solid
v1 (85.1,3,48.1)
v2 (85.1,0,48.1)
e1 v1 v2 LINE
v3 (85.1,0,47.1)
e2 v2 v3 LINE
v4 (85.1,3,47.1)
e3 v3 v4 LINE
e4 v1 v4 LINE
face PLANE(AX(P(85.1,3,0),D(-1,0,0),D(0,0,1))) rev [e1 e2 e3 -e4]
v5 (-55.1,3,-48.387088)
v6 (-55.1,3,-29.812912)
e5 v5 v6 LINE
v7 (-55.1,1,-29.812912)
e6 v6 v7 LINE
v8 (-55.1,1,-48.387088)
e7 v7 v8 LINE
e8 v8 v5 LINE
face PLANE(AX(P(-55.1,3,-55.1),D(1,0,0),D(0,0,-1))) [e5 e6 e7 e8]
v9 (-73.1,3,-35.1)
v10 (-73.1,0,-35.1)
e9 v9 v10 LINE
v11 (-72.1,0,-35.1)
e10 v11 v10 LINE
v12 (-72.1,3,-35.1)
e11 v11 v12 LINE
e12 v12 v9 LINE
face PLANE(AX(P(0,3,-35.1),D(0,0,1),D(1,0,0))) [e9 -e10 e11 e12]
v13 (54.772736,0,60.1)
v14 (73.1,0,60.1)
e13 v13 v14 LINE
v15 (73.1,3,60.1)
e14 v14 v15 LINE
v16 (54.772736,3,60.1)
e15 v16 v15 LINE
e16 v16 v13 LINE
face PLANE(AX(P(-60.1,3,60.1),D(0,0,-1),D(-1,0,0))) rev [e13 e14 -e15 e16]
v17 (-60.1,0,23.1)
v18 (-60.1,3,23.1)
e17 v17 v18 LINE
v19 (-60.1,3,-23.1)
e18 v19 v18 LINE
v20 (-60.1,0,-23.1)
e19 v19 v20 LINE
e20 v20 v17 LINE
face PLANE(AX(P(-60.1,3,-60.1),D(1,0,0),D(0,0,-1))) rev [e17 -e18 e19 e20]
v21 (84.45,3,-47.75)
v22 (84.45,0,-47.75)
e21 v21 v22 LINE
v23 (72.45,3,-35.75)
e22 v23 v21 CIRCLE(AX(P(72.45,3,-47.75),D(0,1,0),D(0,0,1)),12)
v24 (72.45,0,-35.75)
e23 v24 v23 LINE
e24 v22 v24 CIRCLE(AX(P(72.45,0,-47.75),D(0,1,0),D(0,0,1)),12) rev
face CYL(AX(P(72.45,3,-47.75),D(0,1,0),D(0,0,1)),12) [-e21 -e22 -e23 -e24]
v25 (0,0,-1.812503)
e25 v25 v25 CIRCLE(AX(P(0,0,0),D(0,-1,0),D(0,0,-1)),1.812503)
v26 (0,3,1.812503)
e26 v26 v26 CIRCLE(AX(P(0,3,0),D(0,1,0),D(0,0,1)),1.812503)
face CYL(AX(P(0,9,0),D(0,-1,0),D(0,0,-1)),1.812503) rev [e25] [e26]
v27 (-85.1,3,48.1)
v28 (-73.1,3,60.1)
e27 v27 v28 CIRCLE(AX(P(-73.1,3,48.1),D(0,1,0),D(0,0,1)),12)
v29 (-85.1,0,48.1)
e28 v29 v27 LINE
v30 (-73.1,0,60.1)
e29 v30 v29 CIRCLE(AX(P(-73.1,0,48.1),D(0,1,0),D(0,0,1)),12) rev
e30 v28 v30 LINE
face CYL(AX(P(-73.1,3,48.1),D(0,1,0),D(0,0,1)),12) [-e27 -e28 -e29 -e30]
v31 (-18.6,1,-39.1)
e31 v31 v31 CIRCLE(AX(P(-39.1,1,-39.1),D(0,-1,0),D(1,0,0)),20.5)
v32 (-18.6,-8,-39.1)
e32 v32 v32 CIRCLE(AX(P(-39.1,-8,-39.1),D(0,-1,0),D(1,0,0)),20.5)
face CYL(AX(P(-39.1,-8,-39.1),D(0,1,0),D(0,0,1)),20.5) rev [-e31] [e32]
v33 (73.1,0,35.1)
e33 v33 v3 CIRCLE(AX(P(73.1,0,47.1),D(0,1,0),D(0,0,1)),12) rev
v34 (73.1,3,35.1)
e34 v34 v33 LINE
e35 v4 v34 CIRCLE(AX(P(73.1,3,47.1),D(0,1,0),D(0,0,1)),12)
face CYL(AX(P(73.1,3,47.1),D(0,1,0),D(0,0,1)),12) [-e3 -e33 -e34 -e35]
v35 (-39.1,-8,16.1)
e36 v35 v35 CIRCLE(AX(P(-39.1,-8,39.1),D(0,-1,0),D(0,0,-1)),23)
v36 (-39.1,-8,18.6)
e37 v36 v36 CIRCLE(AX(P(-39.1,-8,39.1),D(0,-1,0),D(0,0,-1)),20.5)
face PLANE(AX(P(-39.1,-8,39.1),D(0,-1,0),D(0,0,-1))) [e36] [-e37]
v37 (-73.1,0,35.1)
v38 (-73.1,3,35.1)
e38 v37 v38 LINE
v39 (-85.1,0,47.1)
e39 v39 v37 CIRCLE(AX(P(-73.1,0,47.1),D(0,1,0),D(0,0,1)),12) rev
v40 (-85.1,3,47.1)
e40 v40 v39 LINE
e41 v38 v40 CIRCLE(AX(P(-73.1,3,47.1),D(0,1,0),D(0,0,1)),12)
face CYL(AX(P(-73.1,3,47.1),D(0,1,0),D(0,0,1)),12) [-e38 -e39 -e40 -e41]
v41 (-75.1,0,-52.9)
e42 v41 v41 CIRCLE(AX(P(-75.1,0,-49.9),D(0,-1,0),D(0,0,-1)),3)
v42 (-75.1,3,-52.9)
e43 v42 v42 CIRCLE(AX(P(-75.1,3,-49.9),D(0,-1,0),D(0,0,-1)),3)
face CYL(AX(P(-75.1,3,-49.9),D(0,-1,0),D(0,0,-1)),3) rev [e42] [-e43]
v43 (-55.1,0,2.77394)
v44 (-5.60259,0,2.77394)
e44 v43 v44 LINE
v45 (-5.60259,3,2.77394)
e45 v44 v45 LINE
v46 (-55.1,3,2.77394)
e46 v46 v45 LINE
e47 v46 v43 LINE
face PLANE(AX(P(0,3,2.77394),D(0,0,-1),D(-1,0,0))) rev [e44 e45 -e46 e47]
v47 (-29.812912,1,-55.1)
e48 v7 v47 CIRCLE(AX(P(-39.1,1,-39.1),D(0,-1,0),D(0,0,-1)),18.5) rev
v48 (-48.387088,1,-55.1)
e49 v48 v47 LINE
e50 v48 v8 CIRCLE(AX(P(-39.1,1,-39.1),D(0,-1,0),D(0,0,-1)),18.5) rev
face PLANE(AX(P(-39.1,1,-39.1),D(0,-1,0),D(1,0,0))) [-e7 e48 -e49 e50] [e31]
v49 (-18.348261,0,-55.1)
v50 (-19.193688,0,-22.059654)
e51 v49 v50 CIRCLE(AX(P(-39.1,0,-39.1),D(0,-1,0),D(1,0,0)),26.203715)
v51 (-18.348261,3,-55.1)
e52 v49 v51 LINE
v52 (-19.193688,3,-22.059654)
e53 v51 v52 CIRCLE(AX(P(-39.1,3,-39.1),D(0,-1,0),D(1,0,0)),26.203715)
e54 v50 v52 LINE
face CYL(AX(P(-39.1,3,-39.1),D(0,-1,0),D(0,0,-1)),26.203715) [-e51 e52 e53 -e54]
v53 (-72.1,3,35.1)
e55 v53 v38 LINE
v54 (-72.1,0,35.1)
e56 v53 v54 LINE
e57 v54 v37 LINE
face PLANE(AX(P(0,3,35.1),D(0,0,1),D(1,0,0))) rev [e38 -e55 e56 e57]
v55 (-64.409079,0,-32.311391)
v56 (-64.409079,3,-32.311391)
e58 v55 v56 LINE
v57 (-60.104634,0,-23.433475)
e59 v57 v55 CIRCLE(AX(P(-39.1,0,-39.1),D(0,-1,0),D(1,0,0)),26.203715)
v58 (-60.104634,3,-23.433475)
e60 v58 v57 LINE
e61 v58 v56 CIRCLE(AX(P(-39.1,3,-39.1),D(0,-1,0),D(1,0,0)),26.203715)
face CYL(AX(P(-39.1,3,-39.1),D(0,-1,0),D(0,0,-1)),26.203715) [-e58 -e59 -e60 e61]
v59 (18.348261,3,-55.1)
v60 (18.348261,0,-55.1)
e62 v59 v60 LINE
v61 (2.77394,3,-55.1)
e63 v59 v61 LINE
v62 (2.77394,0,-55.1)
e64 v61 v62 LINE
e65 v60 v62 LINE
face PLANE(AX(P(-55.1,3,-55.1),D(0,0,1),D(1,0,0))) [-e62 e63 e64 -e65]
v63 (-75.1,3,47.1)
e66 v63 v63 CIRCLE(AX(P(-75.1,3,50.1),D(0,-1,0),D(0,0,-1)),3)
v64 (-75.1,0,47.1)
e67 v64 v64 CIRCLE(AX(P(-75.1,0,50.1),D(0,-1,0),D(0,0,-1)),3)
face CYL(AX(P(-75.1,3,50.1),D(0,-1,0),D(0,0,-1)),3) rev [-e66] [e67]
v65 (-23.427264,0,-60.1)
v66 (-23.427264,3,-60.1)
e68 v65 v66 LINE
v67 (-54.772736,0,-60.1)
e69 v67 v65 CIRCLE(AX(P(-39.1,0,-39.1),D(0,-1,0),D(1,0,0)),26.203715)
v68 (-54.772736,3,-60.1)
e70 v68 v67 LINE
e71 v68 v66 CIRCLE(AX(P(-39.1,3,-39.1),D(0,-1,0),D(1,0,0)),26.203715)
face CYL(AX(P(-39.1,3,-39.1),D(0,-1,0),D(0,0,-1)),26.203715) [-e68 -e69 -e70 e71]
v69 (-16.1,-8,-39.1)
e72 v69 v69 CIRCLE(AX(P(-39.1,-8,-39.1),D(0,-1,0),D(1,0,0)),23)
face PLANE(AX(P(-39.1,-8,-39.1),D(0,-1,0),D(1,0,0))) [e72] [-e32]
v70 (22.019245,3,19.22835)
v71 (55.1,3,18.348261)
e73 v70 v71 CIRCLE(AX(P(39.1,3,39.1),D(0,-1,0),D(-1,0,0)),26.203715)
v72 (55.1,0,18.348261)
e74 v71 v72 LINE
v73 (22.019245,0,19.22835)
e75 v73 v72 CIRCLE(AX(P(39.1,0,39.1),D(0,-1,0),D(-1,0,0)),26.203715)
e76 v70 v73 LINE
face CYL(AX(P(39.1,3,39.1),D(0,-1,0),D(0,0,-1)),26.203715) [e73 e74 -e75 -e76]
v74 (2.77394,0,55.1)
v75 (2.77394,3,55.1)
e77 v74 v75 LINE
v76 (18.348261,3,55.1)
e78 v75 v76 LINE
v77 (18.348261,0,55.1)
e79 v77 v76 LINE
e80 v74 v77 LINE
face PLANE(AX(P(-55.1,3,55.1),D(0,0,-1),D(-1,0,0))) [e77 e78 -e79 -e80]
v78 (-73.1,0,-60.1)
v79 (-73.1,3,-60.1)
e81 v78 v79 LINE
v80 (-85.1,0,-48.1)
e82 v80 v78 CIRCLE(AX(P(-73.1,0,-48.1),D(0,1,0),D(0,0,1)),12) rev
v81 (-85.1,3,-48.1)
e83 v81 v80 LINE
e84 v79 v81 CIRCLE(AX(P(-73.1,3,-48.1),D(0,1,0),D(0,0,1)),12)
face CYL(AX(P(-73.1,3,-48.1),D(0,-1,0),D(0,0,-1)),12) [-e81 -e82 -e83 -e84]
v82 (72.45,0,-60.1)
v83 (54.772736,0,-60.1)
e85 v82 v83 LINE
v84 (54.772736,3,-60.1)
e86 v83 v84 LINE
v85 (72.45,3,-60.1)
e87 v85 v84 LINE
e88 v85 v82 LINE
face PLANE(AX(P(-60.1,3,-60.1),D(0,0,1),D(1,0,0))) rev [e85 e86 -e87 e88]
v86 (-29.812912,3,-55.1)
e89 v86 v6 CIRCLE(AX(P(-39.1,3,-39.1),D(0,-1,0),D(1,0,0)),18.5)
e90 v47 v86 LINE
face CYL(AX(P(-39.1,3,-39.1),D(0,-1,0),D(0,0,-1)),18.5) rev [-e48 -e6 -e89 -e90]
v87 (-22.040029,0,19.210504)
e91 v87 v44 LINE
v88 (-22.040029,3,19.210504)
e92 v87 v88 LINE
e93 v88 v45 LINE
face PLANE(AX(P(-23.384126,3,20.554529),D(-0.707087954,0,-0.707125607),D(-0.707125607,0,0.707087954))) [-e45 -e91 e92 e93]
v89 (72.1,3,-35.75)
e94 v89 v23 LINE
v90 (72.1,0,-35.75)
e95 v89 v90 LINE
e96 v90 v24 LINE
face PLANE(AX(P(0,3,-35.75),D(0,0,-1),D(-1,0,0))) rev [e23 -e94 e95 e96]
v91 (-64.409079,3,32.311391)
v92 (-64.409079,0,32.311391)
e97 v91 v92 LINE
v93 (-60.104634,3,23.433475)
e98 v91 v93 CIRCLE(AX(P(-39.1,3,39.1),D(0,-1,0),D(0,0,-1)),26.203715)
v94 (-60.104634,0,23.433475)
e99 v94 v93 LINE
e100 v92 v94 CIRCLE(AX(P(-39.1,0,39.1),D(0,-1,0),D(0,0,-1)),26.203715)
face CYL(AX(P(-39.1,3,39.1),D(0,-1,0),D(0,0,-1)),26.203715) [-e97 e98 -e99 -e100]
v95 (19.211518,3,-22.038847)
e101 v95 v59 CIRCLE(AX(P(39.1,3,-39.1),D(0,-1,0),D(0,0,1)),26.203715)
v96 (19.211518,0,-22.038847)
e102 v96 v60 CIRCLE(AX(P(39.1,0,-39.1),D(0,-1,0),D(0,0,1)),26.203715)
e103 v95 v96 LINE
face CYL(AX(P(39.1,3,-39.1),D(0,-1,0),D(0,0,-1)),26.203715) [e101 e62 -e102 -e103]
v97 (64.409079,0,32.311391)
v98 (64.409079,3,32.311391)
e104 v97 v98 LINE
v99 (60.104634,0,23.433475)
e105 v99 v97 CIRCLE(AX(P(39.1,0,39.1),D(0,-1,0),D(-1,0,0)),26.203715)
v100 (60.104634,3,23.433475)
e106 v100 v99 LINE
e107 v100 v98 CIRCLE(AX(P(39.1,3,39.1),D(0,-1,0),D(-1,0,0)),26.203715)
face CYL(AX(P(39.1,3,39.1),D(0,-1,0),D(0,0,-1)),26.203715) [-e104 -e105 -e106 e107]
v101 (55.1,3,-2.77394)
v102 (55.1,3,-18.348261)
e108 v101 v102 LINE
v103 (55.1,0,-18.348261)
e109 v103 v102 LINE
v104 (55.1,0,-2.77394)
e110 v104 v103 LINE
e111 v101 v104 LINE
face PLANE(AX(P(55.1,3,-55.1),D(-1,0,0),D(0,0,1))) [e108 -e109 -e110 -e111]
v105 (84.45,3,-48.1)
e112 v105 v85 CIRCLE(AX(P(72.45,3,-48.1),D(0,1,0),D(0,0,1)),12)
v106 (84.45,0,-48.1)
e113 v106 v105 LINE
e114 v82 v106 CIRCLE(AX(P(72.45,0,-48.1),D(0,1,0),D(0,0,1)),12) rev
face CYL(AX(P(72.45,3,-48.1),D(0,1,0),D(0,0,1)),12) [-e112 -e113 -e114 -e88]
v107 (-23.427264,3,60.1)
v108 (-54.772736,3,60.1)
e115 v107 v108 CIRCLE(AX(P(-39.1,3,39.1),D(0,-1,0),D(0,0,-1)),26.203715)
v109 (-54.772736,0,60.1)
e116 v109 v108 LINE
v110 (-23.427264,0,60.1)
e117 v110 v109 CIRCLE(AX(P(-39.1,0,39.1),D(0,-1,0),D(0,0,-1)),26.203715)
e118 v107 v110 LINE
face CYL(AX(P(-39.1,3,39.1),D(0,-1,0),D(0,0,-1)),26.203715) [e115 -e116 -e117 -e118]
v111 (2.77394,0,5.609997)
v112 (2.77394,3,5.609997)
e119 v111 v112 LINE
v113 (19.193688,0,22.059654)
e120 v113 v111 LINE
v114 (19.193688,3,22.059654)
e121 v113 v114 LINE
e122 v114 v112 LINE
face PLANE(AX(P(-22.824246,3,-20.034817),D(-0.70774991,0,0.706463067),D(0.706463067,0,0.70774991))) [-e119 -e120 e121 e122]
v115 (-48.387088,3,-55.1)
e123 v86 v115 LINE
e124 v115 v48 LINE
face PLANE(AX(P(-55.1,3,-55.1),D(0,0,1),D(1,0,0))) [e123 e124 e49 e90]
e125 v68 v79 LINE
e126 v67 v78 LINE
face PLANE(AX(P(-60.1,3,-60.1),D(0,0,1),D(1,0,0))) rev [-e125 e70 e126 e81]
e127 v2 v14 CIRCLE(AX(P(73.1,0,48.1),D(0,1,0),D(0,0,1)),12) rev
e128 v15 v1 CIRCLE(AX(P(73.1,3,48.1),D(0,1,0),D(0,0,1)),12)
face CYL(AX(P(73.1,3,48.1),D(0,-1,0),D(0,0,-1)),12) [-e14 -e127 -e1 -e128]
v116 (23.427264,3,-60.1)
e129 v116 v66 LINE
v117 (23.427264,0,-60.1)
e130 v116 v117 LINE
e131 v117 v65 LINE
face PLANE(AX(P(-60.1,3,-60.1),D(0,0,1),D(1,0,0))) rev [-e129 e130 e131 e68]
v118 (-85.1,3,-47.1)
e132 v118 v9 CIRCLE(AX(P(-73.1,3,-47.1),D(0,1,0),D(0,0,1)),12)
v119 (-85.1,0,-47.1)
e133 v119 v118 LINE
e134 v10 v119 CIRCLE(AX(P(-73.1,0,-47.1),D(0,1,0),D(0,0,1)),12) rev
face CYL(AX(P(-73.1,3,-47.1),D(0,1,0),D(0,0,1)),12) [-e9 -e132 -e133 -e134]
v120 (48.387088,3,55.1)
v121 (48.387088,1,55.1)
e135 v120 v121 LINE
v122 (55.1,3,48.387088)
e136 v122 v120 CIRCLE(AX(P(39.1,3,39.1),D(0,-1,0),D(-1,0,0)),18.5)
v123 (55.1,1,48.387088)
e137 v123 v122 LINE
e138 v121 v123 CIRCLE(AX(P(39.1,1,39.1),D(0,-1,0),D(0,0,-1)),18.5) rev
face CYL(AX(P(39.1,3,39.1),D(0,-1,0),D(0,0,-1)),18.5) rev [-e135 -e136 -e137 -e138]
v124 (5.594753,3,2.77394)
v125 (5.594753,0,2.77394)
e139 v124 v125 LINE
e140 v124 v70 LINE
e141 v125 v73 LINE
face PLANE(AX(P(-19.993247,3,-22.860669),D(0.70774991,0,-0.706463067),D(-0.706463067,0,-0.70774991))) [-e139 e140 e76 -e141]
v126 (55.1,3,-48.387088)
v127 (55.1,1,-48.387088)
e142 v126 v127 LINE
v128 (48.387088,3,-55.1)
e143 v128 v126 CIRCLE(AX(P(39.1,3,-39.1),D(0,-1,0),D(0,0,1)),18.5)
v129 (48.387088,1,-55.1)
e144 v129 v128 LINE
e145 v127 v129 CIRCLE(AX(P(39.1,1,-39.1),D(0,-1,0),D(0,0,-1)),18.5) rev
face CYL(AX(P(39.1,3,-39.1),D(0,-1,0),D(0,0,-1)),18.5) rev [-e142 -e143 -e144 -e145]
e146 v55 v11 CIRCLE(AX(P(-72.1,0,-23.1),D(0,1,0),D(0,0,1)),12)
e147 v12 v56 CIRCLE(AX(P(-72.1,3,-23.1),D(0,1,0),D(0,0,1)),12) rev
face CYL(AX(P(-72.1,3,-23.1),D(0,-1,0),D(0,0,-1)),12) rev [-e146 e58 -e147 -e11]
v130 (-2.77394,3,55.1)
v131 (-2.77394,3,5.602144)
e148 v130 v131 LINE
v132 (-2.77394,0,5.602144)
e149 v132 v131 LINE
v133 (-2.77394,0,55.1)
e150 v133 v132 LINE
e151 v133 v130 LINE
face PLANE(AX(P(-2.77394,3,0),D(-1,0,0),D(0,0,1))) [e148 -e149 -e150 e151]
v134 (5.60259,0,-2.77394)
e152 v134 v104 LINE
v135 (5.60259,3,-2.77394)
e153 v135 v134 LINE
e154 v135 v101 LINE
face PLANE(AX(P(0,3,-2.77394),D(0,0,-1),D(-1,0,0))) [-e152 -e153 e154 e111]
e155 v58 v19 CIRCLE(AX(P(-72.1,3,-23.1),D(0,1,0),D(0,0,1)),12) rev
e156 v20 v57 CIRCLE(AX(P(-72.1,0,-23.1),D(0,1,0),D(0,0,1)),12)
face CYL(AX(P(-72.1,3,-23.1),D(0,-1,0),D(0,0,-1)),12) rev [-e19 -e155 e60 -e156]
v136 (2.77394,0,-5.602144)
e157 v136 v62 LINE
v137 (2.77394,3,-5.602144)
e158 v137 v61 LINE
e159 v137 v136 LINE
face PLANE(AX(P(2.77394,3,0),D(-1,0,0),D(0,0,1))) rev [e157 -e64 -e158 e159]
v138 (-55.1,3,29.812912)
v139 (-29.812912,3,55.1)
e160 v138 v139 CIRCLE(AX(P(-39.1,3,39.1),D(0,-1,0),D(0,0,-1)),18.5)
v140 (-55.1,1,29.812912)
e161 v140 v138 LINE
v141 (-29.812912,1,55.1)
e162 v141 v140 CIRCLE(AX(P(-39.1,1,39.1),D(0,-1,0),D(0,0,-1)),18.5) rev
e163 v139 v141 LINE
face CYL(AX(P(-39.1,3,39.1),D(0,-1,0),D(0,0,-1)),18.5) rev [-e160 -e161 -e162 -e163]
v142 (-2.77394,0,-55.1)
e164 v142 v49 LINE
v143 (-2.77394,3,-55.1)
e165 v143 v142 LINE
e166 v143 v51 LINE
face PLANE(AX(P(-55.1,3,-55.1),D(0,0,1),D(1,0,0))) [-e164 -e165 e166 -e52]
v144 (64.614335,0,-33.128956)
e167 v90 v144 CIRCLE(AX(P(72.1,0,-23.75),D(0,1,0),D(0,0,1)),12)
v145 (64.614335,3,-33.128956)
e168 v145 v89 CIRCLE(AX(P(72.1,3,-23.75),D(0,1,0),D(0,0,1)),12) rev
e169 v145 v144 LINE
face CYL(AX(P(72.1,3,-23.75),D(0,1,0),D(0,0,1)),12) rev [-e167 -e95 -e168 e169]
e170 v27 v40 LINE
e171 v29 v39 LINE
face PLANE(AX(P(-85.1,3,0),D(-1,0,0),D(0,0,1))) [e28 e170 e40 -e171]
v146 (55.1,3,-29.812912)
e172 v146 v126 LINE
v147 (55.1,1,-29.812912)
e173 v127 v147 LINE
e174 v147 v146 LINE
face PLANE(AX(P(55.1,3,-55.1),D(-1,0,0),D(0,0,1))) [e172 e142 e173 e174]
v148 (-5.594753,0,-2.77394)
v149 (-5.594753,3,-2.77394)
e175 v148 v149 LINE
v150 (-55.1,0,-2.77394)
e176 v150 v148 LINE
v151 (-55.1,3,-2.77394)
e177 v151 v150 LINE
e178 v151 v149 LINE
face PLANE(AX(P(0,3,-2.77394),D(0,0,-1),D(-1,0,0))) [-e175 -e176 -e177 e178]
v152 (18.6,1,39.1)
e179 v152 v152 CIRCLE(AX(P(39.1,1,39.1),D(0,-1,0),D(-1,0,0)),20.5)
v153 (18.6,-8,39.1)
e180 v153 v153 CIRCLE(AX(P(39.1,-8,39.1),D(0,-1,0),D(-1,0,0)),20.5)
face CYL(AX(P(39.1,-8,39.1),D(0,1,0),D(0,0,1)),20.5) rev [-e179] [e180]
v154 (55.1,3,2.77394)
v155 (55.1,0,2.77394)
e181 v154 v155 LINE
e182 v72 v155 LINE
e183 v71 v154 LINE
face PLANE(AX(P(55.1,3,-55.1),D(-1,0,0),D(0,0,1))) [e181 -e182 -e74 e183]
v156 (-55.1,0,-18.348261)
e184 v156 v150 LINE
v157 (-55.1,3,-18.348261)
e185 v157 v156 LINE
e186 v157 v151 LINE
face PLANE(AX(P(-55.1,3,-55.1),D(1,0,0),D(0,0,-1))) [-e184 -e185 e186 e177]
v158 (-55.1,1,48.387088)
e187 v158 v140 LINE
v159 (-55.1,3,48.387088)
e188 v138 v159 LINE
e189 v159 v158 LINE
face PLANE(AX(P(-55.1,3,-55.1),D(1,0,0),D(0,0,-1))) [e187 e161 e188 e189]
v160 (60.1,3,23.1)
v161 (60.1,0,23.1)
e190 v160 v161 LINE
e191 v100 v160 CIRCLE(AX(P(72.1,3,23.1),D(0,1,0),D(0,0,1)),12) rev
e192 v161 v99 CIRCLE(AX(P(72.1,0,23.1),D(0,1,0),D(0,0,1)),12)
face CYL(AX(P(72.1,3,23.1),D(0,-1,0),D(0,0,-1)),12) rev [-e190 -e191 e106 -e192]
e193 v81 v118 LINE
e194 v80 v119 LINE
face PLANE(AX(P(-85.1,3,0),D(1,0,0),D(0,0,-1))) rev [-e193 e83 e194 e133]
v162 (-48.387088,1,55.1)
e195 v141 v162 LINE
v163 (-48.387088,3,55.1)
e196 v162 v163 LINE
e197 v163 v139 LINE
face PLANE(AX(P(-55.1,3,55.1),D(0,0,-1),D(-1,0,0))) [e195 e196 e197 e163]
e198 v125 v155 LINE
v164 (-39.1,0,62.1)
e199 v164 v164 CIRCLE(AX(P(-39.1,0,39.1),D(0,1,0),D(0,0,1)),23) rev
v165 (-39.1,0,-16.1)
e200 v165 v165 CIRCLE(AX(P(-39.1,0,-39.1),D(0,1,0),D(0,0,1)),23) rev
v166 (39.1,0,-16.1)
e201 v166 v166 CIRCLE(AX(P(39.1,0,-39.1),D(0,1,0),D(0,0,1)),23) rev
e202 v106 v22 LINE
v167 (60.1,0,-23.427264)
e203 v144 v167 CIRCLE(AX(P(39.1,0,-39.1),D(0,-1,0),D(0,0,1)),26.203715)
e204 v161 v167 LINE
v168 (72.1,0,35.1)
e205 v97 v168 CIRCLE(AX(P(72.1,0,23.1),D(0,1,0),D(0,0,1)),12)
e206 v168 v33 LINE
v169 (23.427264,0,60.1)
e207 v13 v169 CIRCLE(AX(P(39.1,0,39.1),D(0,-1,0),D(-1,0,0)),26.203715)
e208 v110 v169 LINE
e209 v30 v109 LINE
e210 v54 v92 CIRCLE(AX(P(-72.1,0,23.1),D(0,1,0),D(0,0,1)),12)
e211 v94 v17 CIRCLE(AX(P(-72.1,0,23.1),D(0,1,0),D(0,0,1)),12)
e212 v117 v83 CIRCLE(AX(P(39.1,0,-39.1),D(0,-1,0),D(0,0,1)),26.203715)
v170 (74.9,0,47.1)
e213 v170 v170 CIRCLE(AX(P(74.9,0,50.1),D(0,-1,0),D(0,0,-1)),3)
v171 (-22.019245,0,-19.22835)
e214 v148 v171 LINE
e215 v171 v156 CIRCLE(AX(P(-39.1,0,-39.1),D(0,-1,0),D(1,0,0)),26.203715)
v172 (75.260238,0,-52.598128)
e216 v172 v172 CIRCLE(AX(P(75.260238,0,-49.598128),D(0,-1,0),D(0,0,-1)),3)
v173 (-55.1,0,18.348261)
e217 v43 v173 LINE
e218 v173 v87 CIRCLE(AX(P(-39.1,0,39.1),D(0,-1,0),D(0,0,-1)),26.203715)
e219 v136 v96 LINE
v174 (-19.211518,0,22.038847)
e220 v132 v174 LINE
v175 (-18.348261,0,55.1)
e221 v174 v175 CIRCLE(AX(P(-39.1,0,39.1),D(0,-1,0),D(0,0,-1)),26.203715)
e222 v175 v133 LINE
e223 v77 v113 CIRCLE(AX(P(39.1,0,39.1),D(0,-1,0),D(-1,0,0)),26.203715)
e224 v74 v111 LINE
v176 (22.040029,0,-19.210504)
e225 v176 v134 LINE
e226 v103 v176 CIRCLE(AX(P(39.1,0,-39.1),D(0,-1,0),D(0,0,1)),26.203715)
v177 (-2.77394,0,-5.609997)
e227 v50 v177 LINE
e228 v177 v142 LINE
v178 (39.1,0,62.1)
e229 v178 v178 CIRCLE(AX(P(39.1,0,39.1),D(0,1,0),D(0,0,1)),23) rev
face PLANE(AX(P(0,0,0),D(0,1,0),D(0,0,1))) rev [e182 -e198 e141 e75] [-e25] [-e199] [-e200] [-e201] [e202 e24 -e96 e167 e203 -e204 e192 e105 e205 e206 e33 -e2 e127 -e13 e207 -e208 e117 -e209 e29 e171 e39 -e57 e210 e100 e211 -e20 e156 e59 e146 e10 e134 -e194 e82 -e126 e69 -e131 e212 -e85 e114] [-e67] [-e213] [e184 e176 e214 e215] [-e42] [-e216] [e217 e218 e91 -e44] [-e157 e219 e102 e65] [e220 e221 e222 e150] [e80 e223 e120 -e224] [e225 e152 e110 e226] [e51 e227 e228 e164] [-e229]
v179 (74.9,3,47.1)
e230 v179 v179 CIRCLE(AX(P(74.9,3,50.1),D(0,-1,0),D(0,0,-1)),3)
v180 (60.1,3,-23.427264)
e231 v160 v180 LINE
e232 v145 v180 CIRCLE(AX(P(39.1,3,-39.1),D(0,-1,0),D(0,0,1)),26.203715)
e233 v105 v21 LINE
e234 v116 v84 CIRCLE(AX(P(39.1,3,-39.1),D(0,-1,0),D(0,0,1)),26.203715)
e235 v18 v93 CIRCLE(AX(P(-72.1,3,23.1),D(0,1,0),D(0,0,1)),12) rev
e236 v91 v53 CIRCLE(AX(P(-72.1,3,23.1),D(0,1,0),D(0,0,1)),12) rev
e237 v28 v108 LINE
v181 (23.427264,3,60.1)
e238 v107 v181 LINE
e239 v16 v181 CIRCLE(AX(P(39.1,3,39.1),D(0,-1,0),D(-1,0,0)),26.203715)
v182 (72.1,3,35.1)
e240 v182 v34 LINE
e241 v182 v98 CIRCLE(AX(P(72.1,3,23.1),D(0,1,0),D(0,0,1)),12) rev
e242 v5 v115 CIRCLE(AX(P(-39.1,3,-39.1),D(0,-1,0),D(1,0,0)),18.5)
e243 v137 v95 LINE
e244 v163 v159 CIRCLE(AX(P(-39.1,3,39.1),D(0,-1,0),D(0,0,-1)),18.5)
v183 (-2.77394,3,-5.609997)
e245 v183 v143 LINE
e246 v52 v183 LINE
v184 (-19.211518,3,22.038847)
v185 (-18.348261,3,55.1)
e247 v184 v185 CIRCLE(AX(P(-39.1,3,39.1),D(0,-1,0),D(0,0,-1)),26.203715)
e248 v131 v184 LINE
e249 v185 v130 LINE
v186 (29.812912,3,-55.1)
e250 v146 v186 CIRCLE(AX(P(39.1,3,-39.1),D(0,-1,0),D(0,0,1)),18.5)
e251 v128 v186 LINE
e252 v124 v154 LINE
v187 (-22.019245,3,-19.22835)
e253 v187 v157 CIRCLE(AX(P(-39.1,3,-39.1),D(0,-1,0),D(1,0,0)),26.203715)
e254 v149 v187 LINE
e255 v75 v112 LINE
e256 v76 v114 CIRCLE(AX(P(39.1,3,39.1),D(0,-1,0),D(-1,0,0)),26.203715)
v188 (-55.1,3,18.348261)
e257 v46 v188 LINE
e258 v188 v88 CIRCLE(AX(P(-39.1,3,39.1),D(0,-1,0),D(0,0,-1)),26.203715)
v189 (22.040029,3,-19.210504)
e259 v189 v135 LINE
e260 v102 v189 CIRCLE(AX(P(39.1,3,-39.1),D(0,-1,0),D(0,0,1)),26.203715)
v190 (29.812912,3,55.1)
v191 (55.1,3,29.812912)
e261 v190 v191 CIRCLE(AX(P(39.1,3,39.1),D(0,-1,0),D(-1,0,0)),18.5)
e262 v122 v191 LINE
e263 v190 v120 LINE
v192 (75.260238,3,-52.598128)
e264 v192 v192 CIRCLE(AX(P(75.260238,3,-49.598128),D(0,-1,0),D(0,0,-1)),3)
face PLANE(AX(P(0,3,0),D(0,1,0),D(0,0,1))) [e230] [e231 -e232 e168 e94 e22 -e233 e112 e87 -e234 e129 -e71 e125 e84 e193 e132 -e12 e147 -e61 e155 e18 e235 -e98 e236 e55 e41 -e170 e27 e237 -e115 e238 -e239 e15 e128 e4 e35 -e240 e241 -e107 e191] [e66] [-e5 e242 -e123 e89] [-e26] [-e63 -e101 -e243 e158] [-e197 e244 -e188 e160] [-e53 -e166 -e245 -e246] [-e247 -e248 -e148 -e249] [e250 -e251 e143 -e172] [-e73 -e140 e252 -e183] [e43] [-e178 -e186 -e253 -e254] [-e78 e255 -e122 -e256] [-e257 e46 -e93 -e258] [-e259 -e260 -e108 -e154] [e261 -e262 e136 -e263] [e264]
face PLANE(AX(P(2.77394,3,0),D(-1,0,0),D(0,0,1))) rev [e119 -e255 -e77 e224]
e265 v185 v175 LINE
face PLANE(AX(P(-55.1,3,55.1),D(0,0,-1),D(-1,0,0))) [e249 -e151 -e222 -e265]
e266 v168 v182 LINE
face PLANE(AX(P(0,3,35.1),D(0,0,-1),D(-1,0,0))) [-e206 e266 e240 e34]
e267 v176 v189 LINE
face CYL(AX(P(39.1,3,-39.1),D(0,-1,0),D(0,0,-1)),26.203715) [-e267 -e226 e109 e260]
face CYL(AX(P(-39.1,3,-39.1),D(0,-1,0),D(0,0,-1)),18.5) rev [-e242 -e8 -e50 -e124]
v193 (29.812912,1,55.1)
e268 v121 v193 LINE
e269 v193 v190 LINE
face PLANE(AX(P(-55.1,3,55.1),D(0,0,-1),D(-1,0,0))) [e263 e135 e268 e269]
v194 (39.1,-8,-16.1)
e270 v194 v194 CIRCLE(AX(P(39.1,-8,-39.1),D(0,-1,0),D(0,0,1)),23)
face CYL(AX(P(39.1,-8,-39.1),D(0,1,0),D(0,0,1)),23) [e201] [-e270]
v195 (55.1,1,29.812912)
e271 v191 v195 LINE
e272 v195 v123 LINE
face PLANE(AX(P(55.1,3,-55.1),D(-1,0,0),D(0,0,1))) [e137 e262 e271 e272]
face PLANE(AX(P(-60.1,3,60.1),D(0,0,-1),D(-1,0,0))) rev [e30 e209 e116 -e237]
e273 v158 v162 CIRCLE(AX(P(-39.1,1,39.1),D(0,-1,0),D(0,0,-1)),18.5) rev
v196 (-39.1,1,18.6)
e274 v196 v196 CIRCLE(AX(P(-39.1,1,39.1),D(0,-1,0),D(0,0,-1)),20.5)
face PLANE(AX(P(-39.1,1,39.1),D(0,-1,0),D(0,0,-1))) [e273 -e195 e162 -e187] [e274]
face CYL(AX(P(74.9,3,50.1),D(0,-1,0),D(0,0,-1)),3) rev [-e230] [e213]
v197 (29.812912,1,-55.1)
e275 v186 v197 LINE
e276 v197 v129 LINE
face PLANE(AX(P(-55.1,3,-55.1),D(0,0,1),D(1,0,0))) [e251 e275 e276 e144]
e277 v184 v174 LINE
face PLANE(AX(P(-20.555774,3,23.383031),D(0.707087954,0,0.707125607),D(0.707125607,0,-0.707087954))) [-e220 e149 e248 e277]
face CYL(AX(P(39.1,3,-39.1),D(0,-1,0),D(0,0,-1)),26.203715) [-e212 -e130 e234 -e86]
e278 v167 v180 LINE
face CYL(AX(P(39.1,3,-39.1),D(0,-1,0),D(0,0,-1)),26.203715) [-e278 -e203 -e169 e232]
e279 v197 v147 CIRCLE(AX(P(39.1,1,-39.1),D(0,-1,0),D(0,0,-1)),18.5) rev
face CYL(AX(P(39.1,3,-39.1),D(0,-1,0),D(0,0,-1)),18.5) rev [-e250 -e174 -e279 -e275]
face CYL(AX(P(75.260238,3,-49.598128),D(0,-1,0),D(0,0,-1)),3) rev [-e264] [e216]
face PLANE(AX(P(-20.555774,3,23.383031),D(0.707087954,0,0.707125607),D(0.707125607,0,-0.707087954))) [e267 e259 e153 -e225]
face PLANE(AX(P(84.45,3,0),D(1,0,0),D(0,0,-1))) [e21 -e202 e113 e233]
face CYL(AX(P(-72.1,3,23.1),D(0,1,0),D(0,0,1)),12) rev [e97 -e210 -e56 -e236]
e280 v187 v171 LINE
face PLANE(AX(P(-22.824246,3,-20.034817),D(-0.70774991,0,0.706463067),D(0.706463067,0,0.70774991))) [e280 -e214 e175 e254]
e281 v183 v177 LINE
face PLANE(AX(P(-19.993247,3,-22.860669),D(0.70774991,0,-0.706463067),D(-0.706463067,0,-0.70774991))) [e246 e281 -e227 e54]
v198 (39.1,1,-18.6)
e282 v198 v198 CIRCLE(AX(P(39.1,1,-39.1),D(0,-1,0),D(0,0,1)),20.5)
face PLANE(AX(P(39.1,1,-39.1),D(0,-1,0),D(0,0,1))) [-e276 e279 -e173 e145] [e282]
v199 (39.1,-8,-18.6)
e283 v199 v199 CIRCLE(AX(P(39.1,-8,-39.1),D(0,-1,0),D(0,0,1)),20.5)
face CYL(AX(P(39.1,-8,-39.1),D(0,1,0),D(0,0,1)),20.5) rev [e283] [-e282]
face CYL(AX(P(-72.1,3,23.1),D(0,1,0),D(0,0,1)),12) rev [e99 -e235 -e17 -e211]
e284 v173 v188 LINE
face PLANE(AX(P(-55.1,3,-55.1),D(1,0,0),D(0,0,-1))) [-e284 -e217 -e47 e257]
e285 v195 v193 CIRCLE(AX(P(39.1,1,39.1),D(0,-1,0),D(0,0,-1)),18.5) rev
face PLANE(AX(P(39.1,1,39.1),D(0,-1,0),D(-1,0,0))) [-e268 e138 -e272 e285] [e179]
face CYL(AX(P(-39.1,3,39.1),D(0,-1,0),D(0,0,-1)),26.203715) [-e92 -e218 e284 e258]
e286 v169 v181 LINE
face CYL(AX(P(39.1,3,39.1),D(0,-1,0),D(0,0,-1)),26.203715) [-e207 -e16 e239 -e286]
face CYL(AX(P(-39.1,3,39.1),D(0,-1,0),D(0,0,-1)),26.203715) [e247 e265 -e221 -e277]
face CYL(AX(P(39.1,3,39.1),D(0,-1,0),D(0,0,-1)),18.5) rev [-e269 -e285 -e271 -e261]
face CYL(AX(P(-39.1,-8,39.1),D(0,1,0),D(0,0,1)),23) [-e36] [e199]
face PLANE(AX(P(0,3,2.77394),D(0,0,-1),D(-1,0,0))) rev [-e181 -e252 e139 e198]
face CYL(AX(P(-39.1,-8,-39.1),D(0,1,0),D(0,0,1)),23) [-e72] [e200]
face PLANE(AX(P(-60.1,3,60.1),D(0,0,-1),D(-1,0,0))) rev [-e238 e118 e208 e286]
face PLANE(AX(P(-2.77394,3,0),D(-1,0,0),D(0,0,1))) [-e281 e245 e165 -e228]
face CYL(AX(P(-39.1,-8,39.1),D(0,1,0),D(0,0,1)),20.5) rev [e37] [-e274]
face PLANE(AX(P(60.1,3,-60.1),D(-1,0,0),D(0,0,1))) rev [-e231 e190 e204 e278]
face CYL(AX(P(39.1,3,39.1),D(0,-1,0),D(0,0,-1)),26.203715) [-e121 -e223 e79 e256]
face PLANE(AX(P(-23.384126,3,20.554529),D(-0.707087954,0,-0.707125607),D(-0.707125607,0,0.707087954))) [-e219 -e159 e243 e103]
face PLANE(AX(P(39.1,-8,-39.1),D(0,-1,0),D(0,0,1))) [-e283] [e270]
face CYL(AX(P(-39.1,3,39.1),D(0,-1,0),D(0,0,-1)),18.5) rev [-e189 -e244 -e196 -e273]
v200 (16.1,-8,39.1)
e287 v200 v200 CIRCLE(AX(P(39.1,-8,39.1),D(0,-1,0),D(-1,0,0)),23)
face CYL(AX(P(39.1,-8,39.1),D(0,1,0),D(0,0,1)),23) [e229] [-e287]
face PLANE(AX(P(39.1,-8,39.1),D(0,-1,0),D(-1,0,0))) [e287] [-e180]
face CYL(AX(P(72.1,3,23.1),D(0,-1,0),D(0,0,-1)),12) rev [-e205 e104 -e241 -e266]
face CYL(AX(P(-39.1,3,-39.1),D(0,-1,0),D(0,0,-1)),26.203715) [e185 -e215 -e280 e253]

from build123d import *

# Parameters (mm, degrees)
SKETCH1_W           = 120.2
SKETCH1_H           = 120.2
SKETCH1_W_2         = 110.2
SKETCH1_H_2         = 110.2
BOSS_EXTRUDE1_DEPTH = 3
SKETCH3_W           = 25
SKETCH3_H           = 25
SKETCH3_R           = 3
SKETCH3_W_2         = 24.35
SKETCH3_H_2         = 24.35
BOSS_EXTRUDE3_DEPTH = 3
FILLET1_R           = 12
SKETCH4_R           = 26.20371479
SKETCH4_R_2         = 18.5
BOSS_EXTRUDE4_DEPTH = 3
SKETCH5_R           = 23
SKETCH5_R_2         = 20.5
BOSS_EXTRUDE5_DEPTH = 8
SKETCH6_R           = 14.298791064
BOSS_EXTRUDE6_DEPTH = 5.7
CIRPATTERN1_COUNT   = 4
SKETCH7_R           = 21.686675293
CUT_EXTRUDE1_DEPTH  = 5.7
BOSS_EXTRUDE7_DEPTH = 3
BOSS_EXTRUDE8_DEPTH = 3
BOSS_EXTRUDE9_DEPTH = 3
CUT_EXTRUDE2_START  = -9
SKETCH12_R          = 20.5
CUT_EXTRUDE2_DEPTH  = 9
SKETCH14_R          = 1.812502671
CUT_EXTRUDE3_DEPTH  = 9
CIRPATTERN2_COUNT   = 4


with BuildPart() as part:
    # Sketch1 → Boss-Extrude1 (new body)
    with BuildSketch(Plane(origin=(0, 0, 0), x_dir=(1, 0, 0), z_dir=(0, 1, 0))):
        Rectangle(SKETCH1_W, SKETCH1_H)
        Rectangle(SKETCH1_W_2, SKETCH1_H_2, mode=Mode.SUBTRACT)
    extrude(amount=BOSS_EXTRUDE1_DEPTH)

    # Sketch3 → Boss-Extrude3 (add)
    # profile 1 of 4: a face of its own
    with BuildSketch(Plane(origin=(0, 0, 0), x_dir=(-1, 0, 0), z_dir=(0, -1, 0))):
        with Locations((72.6, -47.6)):
            Rectangle(SKETCH3_W, SKETCH3_H)
        with Locations((75.1, -50.1)):
            Circle(SKETCH3_R, mode=Mode.SUBTRACT)
    # profile 2 of 4: a face of its own
    with BuildSketch(Plane(origin=(0, 0, 0), x_dir=(-1, 0, 0), z_dir=(0, -1, 0))):
        with Locations((-72.275, 47.925)):
            Rectangle(SKETCH3_W_2, SKETCH3_H_2)
        with Locations((-75.260238187, 49.598128293)):
            Circle(SKETCH3_R, mode=Mode.SUBTRACT)
    # profile 3 of 4: a face of its own
    with BuildSketch(Plane(origin=(0, 0, 0), x_dir=(-1, 0, 0), z_dir=(0, -1, 0))):
        Polygon((-60.1, -60.1), (-60.1, -50.1), (-60.1, -35.1), (-85.1, -35.1), (-85.1, -60.1), align=None)
        with Locations((-74.9, -50.1)):
            Circle(SKETCH3_R, mode=Mode.SUBTRACT)
    # profile 4 of 4: a face of its own
    with BuildSketch(Plane(origin=(0, 0, 0), x_dir=(-1, 0, 0), z_dir=(0, -1, 0))):
        Polygon((60.1, 35.1), (75.1, 35.1), (85.1, 35.1), (85.1, 60.1), (60.1, 60.1), align=None)
        with Locations((75.1, 49.9)):
            Circle(SKETCH3_R, mode=Mode.SUBTRACT)
    extrude(amount=-BOSS_EXTRUDE3_DEPTH)

    # Fillet1
    fillet1_edges = [part.edges().sort_by_distance(p)[0] for p in [
        (85.1, 1.5, 60.1),
        (85.1, 1.5, 35.1),
        (60.1, 1.5, 35.1),
        (-85.1, 1.5, -60.1),
        (-85.1, 1.5, -35.1),
        (-60.1, 1.5, -35.1),
        (-60.1, 1.5, 35.1),
        (-85.1, 1.5, 60.1),
        (-85.1, 1.5, 35.1),
        (84.45, 1.5, -60.1),
        (84.45, 1.5, -35.75),
        (60.1, 1.5, -35.75),
    ]]
    fillet(fillet1_edges, radius=FILLET1_R)

    # Sketch4 → Boss-Extrude4 (add)
    with BuildSketch(Plane(origin=(0, 0, 0), x_dir=(-1, 0, 0), z_dir=(0, -1, 0))):
        with Locations((39.1, -39.1)):
            Circle(SKETCH4_R)
        with Locations((39.1, -39.1)):
            Circle(SKETCH4_R_2, mode=Mode.SUBTRACT)
    boss_extrude4 = extrude(amount=-BOSS_EXTRUDE4_DEPTH)

    # Sketch5 → Boss-Extrude5 (add)
    with BuildSketch(Plane(origin=(0, 0, 0), x_dir=(-1, 0, 0), z_dir=(0, -1, 0))):
        with Locations((39.1, -39.1)):
            Circle(SKETCH5_R)
        with Locations((39.1, -39.1)):
            Circle(SKETCH5_R_2, mode=Mode.SUBTRACT)
    boss_extrude5 = extrude(amount=BOSS_EXTRUDE5_DEPTH)

    # CirPattern1: Boss-Extrude4, Boss-Extrude5 ×4 about axis
    cirpattern1_axis = Axis((0, 0, 0), (0, 1, 0))
    add([boss_extrude4.rotate(cirpattern1_axis, i * 360 / CIRPATTERN1_COUNT) for i in range(1, CIRPATTERN1_COUNT)])
    add([boss_extrude5.rotate(cirpattern1_axis, i * 360 / CIRPATTERN1_COUNT) for i in range(1, CIRPATTERN1_COUNT)])

    # Sketch8 → Boss-Extrude7 (add)
    with BuildSketch(Plane(origin=(0, 0, 0), x_dir=(-1, 0, 0), z_dir=(0, -1, 0))):
        Polygon((2.773939536, -2.773939536), (55.1, -2.773939536), (55.1, 2.773939536), (2.773939536, 2.773939536), (2.773939536, 58.599472693), (-2.773939536, 58.599472693), (-2.773939536, 2.773939536), (-55.1, 2.773939536), (-55.1, -2.773939536), (-2.773939536, -2.773939536), (-2.773939536, -58.599472693), (2.773939536, -58.599472693), align=None)
    extrude(amount=-BOSS_EXTRUDE7_DEPTH)

    # Sketch9 → Boss-Extrude8 (add)
    with BuildSketch(Plane(origin=(0, 0, 0), x_dir=(-1, 0, 0), z_dir=(0, -1, 0))):
        Polygon((22.82424649, 20.034817185), (-19.99324685, -22.860669453), (-22.82424649, -20.034817185), (19.99324685, 22.860669453), align=None)
    extrude(amount=-BOSS_EXTRUDE8_DEPTH)

    # Sketch10 → Boss-Extrude9 (add)
    with BuildSketch(Plane(origin=(0, 0, 0), x_dir=(-1, 0, 0), z_dir=(0, -1, 0))):
        Polygon((23.384125812, -20.554528832), (-20.555773995, 23.383031261), (-23.384125812, 20.554528832), (20.555773995, -23.383031261), align=None)
    extrude(amount=-BOSS_EXTRUDE9_DEPTH)

    # Sketch12 → Cut-Extrude2 (cut)
    with BuildSketch(Plane(origin=(0, -8, 0), x_dir=(-1, 0, 0), z_dir=(0, -1, 0)).offset(CUT_EXTRUDE2_START)):
        with Locations((39.1, -39.1)):
            Circle(SKETCH12_R)
    cut_extrude2 = extrude(amount=CUT_EXTRUDE2_DEPTH, mode=Mode.SUBTRACT)

    # Sketch14 → Cut-Extrude3 (cut)
    with BuildSketch(Plane(origin=(0, 0, 0), x_dir=(-1, 0, 0), z_dir=(0, -1, 0))):
        Circle(SKETCH14_R)
    extrude(amount=-CUT_EXTRUDE3_DEPTH, mode=Mode.SUBTRACT)

    # CirPattern2: Cut-Extrude2 ×4 about axis
    cirpattern2_axis = Axis((0, 0, 0), (0, -1, 0))
    for i in range(1, CIRPATTERN2_COUNT):
        add(cut_extrude2.rotate(cirpattern2_axis, i * 360 / CIRPATTERN2_COUNT), mode=Mode.SUBTRACT)


with BuildPart() as body_2:
    # Sketch6 → Boss-Extrude6 (new body)
    with BuildSketch(Plane(origin=(0, 0, 0), x_dir=(1, 0, 0), z_dir=(0, 1, 0))):
        Circle(SKETCH6_R)
    extrude(amount=BOSS_EXTRUDE6_DEPTH)

    # Sketch7 → Cut-Extrude1 (cut)
    with BuildSketch(Plane(origin=(0, 0, 0), x_dir=(-1, 0, 0), z_dir=(0, -1, 0))):
        Circle(SKETCH7_R)
    extrude(amount=-CUT_EXTRUDE1_DEPTH, mode=Mode.SUBTRACT)


solid = part.part
